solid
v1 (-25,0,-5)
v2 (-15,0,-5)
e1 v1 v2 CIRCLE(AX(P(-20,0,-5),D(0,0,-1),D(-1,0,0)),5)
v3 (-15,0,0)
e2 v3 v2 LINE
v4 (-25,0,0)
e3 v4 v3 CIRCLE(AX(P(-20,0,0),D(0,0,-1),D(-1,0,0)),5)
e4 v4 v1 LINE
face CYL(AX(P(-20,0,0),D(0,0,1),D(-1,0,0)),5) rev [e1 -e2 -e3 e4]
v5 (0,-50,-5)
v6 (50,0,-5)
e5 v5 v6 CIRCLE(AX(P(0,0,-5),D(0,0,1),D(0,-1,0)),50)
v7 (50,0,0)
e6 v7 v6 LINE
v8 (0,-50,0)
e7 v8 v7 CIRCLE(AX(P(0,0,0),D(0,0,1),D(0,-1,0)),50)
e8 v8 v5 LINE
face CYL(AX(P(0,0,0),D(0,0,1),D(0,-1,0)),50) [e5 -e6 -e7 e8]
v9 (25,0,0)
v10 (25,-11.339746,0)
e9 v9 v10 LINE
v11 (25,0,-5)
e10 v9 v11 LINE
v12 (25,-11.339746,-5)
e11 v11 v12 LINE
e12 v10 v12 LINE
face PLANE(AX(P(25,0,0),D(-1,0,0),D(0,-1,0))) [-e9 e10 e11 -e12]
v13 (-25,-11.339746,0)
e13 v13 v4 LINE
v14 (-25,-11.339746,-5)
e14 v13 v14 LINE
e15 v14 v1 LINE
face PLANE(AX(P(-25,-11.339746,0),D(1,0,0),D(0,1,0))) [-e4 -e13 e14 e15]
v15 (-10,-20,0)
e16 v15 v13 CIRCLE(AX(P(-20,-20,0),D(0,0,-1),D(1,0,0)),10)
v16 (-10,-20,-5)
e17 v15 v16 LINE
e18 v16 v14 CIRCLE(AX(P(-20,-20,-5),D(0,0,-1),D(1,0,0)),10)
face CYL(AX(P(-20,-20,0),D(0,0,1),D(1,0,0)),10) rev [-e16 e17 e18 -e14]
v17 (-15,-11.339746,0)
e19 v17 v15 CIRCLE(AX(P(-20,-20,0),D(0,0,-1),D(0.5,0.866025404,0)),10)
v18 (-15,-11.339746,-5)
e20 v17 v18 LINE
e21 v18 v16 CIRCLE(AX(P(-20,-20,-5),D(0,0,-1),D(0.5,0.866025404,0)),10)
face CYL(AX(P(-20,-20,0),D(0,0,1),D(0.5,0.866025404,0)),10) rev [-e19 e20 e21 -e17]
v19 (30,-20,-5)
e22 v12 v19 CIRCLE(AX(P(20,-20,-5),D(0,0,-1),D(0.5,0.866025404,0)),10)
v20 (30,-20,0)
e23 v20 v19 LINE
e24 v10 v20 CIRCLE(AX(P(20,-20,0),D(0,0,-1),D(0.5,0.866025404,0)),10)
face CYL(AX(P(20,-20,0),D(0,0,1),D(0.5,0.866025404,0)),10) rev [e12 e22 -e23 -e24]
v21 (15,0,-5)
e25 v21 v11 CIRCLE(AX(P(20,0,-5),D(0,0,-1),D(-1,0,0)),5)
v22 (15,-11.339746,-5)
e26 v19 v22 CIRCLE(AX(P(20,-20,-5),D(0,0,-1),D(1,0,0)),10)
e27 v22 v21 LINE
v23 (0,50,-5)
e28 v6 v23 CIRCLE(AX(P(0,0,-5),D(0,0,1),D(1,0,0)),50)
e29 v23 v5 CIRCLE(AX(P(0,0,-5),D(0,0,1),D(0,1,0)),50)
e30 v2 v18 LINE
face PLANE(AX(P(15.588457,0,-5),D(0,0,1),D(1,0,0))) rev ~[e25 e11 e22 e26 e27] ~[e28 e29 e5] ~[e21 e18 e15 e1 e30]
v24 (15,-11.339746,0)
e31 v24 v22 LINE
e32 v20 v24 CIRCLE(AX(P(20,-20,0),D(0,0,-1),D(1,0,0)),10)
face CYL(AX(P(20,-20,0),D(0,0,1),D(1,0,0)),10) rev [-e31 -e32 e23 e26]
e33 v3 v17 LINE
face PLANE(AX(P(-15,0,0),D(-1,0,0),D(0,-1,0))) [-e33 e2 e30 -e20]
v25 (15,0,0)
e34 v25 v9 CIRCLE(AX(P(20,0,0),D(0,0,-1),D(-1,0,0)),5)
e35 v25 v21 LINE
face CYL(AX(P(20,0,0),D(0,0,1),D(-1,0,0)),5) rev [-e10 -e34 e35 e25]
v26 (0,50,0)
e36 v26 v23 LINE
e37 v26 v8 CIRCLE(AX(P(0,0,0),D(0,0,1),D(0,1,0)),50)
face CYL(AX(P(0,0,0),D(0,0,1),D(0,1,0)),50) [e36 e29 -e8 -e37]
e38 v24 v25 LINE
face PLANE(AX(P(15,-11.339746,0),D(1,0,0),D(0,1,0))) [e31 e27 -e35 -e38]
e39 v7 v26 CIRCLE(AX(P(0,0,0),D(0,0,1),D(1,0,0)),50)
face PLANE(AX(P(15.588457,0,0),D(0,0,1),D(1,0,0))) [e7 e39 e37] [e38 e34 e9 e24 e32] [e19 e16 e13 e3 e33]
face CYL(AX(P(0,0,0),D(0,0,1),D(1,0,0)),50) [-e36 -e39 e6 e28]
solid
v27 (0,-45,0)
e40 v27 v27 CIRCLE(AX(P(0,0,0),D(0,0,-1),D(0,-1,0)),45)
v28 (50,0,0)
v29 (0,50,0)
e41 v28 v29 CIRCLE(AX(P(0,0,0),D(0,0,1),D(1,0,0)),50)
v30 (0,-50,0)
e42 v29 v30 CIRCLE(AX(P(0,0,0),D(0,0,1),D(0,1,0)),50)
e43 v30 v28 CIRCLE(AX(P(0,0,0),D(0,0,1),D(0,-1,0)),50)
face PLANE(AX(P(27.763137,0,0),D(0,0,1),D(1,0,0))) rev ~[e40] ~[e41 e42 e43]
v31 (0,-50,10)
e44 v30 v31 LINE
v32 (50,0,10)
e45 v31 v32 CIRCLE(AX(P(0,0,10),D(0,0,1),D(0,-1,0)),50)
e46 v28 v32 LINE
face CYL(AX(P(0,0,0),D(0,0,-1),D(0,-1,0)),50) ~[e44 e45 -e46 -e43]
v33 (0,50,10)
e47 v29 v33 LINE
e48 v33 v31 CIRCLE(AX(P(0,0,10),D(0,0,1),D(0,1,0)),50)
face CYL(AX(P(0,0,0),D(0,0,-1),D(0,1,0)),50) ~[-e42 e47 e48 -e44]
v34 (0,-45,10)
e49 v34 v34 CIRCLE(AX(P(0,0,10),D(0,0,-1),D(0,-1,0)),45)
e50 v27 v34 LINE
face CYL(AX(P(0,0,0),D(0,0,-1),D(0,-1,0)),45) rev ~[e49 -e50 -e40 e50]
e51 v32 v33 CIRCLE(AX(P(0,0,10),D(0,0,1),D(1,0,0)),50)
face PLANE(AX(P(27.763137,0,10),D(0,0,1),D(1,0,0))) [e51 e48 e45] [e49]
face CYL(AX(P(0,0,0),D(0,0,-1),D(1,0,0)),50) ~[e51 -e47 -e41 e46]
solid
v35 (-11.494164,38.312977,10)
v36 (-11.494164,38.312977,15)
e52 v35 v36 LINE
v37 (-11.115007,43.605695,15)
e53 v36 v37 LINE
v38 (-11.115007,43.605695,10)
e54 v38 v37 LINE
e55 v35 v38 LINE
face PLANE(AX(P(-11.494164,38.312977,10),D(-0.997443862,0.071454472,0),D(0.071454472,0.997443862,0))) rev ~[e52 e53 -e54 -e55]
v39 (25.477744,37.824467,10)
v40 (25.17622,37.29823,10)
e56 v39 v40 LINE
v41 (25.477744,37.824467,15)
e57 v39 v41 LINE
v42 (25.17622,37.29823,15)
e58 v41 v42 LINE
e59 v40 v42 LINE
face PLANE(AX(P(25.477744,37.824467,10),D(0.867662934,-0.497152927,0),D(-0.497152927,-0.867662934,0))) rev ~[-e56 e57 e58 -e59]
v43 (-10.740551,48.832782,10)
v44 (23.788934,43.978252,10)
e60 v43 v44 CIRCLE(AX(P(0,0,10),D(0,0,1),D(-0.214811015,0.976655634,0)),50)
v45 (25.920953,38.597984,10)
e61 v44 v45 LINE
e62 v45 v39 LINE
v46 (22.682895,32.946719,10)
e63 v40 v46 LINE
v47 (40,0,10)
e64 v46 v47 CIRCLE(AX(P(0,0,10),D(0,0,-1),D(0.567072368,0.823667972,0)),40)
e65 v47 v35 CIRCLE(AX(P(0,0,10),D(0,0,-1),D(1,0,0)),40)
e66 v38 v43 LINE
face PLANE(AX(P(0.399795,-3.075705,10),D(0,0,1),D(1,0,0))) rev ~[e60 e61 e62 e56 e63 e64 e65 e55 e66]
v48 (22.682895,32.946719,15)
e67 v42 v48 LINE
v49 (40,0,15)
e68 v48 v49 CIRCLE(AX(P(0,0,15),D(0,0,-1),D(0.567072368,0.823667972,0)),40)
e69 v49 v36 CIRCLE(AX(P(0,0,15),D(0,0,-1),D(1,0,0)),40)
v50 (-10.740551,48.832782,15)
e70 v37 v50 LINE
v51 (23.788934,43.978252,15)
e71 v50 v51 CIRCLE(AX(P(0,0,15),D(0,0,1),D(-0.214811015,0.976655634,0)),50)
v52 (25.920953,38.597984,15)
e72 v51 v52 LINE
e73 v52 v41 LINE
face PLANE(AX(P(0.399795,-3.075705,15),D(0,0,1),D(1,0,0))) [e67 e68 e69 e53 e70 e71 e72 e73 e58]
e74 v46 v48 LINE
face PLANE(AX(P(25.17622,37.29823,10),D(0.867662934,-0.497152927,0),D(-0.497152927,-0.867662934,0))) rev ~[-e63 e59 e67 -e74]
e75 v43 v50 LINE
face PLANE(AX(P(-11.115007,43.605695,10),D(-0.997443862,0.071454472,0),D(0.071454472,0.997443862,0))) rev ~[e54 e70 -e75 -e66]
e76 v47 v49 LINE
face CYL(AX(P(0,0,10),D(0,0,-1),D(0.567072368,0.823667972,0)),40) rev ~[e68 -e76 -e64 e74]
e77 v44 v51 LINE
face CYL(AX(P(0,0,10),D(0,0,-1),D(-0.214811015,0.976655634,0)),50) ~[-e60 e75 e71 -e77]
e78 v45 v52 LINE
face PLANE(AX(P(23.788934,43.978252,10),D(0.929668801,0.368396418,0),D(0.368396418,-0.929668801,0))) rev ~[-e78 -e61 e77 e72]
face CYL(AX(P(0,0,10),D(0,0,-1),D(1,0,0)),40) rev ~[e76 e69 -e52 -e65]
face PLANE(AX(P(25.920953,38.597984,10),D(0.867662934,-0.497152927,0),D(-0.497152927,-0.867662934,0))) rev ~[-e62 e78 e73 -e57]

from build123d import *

# Parameters (mm, degrees)
F1_DEPTH = 5
F2_DEPTH = 10
F4_DEPTH = 5


with BuildPart() as f1:
    # F0 (on Top) → F1 (new body)
    with BuildSketch(Plane.XY):
        with BuildLine():
            ThreePointArc((0, -45), (31.8198051534, -31.8198051534), (45, 0))
            ThreePointArc((45, 0), (31.8198051534, 31.8198051534), (0, 45))
            Line((0, 45), (0, -45))
        make_face()
        with BuildLine():
            Line((15, -11.3397459622), (15, 0))
            ThreePointArc((15, 0), (20, 5), (25, 0))
            Line((25, 0), (25, -11.3397459622))
            ThreePointArc((25, -11.3397459622), (28.6602540378, -15), (30, -20))
            ThreePointArc((30, -20), (15, -28.6602540378), (15, -11.3397459622))
        make_face(mode=Mode.SUBTRACT)
        with BuildLine():
            ThreePointArc((0, 45), (31.8198051534, 31.8198051534), (45, 0))
            ThreePointArc((45, 0), (31.8198051534, -31.8198051534), (0, -45))
            Line((0, -45), (0, -50))
            ThreePointArc((0, -50), (35.3553390593, -35.3553390593), (50, 0))
            ThreePointArc((50, 0), (35.3553390593, 35.3553390593), (0, 50))
            Line((0, 50), (0, 45))
        make_face()
        with BuildLine():
            ThreePointArc((0, -45), (-45, 0), (0, 45))
            Line((0, 45), (0, 50))
            ThreePointArc((0, 50), (-50, 0), (0, -50))
            Line((0, -50), (0, -45))
        make_face()
        with BuildLine():
            Line((0, -45), (0, 45))
            ThreePointArc((0, 45), (-45, 0), (0, -45))
        make_face()
        with BuildLine():
            ThreePointArc((-25, 0), (-20, 5), (-15, 0))
            Line((-15, 0), (-15, -11.3397459622))
            ThreePointArc((-15, -11.3397459622), (-11.3397459622, -15), (-10, -20))
            ThreePointArc((-10, -20), (-25, -28.6602540378), (-25, -11.3397459622))
            Line((-25, -11.3397459622), (-25, 0))
        make_face(mode=Mode.SUBTRACT)
    extrude(amount=-F1_DEPTH)


with BuildPart() as f2:
    # F0 (on Top) → F2 (new body)
    with BuildSketch(Plane.XY):
        with BuildLine():
            ThreePointArc((0, 45), (31.8198051534, 31.8198051534), (45, 0))
            ThreePointArc((45, 0), (31.8198051534, -31.8198051534), (0, -45))
            Line((0, -45), (0, -50))
            ThreePointArc((0, -50), (35.3553390593, -35.3553390593), (50, 0))
            ThreePointArc((50, 0), (35.3553390593, 35.3553390593), (0, 50))
            Line((0, 50), (0, 45))
        make_face()
        with BuildLine():
            ThreePointArc((0, -45), (-45, 0), (0, 45))
            Line((0, 45), (0, 50))
            ThreePointArc((0, 50), (-50, 0), (0, -50))
            Line((0, -50), (0, -45))
        make_face()
    extrude(amount=F2_DEPTH)


with BuildPart() as f4:
    # F3 (on face) → F4 (new body)
    with BuildSketch(Plane.XY.offset(10)):
        with BuildLine():
            ThreePointArc((-10.7405507664, 48.8327817069), (-31.3286806432, -38.9681122093), (50, 0))
            ThreePointArc((50, 0), (42.9502428012, 25.598371888), (23.7889342673, 43.9782515162))
            Line((23.7889342673, 43.9782515162), (25.9209529209, 38.5979841529))
            Line((25.9209529209, 38.5979841529), (25.4777438216, 37.8244674206))
            Line((25.4777438216, 37.8244674206), (25.1762203925, 37.298229539))
            ThreePointArc((25.1762203925, 37.298229539), (39.7361920525, 21.1195416894), (45, 0))
            ThreePointArc((45, 0), (-27.6118154109, -35.53290939), (-11.115006654, 43.6056948928))
            Line((-11.115006654, 43.6056948928), (-10.7405507664, 48.8327817069))
        make_face()
        with BuildLine():
            Line((-11.4941642101, 38.3129767717), (-11.115006654, 43.6056948928))
            ThreePointArc((-11.115006654, 43.6056948928), (-27.6118154109, -35.53290939), (45, 0))
            ThreePointArc((45, 0), (39.7361920525, 21.1195416894), (25.1762203925, 37.298229539))
            Line((25.1762203925, 37.298229539), (22.6828947397, 32.9467188993))
            ThreePointArc((22.6828947397, 32.9467188993), (35.407031714, 18.6102688107), (40, 0))
            ThreePointArc((40, 0), (-23.8771169909, -32.0917946554), (-11.4941642101, 38.3129767717))
        make_face()
    extrude(amount=F4_DEPTH)


solid = Compound([f1.part, f2.part, f4.part])
